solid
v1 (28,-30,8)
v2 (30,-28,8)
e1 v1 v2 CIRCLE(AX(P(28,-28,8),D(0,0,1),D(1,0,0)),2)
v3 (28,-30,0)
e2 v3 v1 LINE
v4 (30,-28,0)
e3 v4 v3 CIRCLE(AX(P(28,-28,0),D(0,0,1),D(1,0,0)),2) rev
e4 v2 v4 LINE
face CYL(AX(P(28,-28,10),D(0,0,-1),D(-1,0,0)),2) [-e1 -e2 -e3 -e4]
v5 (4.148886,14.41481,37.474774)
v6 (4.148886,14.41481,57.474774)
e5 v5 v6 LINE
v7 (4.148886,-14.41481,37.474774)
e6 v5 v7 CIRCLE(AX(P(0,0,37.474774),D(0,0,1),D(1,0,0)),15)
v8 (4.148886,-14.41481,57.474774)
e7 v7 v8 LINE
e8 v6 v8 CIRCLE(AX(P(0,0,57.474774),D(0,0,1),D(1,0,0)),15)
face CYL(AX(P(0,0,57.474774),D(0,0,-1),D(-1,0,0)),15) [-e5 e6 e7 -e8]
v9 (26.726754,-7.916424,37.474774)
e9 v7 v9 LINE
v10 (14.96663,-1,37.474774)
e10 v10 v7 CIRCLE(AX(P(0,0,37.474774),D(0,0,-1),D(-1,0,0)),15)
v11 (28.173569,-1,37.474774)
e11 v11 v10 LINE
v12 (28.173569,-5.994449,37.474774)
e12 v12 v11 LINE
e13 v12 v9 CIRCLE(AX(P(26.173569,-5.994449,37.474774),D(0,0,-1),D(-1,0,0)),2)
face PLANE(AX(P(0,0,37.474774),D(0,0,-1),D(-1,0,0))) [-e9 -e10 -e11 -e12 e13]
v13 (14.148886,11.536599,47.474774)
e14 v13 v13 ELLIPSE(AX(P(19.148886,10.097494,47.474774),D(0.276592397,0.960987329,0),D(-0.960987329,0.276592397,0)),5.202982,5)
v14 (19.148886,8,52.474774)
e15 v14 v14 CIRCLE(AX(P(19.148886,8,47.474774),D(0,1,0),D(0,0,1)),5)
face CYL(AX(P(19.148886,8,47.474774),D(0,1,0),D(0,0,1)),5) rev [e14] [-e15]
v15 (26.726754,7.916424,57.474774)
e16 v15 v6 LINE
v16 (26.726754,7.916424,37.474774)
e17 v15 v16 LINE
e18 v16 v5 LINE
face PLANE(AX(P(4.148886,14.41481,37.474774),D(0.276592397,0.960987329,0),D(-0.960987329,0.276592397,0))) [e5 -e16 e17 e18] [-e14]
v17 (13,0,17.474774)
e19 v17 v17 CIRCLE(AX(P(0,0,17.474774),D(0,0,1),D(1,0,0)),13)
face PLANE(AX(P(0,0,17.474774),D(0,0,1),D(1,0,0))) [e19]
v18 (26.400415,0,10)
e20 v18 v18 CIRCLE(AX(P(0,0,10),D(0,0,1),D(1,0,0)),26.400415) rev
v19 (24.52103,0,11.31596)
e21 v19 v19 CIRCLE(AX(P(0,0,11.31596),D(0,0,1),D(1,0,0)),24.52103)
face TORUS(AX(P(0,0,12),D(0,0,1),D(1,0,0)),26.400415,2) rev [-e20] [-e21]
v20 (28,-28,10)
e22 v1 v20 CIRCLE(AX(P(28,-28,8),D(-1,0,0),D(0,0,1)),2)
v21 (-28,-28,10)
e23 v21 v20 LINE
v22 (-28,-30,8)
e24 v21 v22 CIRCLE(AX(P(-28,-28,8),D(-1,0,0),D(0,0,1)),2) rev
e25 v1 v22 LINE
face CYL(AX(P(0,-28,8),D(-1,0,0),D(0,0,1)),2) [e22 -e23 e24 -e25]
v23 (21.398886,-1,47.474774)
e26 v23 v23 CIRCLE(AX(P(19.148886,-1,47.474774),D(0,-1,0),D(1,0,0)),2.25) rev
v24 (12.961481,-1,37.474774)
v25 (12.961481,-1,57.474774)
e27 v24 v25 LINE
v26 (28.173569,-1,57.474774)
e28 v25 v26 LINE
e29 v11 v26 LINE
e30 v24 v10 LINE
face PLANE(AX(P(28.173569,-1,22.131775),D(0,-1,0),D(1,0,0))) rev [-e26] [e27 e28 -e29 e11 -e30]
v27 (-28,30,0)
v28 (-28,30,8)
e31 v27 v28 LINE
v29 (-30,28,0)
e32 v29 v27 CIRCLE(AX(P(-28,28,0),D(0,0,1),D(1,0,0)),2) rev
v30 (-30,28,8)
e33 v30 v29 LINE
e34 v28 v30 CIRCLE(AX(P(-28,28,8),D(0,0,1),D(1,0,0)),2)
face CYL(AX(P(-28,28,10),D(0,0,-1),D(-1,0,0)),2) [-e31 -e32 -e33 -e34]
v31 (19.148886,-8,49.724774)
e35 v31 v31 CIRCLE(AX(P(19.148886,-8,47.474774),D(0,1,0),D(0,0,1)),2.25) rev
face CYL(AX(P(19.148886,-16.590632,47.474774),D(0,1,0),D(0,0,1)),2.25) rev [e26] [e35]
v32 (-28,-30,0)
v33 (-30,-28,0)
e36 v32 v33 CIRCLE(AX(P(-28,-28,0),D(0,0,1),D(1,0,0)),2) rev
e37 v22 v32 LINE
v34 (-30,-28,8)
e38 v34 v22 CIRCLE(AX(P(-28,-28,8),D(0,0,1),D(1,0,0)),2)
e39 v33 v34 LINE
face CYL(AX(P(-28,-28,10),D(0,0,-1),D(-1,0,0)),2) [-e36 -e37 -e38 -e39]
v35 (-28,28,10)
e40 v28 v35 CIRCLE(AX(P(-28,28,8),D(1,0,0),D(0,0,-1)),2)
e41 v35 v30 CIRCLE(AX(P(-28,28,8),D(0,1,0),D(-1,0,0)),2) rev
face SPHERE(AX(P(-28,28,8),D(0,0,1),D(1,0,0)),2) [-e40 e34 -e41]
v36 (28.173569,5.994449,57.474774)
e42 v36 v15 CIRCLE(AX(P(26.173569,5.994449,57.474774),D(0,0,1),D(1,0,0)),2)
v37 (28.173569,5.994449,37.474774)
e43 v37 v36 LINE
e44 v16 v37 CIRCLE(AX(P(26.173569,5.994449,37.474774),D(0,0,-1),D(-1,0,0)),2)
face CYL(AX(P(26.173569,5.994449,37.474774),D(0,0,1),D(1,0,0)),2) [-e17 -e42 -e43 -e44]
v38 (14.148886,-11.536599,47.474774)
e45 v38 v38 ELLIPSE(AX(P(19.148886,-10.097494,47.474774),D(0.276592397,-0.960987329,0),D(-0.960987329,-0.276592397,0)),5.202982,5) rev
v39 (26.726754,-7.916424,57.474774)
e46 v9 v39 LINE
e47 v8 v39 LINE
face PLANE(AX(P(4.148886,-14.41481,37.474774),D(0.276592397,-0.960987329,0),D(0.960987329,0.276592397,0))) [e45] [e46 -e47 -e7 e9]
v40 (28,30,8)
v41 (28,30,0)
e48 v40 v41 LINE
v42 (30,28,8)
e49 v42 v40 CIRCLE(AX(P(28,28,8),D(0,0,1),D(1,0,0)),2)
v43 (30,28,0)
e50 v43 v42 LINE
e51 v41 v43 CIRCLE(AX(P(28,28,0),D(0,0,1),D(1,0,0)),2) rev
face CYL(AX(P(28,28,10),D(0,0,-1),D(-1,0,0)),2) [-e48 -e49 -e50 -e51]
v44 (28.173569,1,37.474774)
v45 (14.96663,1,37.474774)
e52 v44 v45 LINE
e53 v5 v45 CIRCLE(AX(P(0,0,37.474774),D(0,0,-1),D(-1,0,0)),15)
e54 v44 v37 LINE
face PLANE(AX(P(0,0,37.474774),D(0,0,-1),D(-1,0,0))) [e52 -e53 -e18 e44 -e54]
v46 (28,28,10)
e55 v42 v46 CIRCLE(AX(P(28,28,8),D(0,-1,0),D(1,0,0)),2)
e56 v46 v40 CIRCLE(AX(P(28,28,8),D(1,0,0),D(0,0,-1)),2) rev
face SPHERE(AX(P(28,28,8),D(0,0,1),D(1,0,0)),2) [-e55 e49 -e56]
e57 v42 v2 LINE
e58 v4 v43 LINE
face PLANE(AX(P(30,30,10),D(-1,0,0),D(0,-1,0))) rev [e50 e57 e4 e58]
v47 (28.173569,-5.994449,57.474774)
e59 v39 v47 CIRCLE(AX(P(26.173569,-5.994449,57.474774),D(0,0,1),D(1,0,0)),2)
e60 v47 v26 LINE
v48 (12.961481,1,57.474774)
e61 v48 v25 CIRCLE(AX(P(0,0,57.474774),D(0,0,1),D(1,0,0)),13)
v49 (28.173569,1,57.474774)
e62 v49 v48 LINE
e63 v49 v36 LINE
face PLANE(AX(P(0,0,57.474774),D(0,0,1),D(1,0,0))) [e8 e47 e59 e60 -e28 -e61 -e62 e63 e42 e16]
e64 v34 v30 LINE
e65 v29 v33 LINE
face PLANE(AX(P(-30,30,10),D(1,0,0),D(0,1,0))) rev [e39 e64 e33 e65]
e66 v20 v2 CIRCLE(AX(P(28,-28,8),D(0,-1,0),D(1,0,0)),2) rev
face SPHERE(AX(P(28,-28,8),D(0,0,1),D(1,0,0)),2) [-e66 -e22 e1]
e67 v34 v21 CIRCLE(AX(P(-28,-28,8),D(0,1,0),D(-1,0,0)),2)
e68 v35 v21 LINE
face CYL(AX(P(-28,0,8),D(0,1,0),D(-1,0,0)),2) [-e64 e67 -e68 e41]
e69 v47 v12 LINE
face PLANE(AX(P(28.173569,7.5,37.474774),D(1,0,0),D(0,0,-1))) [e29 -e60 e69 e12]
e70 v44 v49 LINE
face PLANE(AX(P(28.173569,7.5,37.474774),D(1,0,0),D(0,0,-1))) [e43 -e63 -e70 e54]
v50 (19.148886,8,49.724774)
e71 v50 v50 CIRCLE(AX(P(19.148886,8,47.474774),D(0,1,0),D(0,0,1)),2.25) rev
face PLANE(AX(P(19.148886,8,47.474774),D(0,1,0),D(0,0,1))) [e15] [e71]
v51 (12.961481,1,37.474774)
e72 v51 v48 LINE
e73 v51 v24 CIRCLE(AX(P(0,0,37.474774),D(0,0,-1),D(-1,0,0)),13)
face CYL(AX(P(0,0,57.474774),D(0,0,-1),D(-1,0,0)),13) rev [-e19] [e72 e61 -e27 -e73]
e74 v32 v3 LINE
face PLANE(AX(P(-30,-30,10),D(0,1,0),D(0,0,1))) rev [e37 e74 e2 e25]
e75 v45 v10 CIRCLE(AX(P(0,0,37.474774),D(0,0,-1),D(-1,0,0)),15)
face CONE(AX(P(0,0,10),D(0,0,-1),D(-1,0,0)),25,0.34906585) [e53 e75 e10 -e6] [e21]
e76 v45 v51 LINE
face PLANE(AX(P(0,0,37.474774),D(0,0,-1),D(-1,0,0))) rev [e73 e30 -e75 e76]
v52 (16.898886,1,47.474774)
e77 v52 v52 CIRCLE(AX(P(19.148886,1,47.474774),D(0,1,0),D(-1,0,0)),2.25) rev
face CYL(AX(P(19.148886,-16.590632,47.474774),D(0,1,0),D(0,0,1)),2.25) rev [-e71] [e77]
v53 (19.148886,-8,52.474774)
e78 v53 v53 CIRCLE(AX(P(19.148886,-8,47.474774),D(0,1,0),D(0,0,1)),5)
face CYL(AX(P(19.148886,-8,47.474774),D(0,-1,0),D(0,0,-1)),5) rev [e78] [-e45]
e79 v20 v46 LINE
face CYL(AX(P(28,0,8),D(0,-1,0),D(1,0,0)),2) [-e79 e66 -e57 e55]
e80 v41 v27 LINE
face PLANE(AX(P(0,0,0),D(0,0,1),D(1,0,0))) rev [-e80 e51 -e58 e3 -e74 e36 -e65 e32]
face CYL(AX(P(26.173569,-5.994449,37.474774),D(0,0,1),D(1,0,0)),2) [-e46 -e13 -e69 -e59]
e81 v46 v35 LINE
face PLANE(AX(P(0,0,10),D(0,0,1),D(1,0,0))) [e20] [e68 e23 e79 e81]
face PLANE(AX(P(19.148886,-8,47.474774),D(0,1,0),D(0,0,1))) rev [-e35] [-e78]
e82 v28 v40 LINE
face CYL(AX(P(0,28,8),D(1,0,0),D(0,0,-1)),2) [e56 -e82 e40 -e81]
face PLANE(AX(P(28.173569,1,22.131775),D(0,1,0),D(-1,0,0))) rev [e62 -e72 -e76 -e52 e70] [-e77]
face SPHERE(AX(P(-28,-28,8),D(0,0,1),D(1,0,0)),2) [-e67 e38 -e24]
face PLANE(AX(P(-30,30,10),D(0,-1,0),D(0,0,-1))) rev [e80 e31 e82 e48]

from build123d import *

# Parameters (mm, degrees)
SKETCH1_W           = 60
SKETCH1_H           = 60
BOSS_EXTRUDE1_DEPTH = 10
FILLET1_R           = 2
FILLET2_R           = 2
SKETCH3_R           = 15
SKETCH3_R_2         = 13
BOSS_EXTRUDE2_DEPTH = 20
CUT_EXTRUDE1_START  = -20
SKETCH4_R           = 13
CUT_EXTRUDE1_DEPTH  = 20
BOSS_EXTRUDE4_START = -20
BOSS_EXTRUDE4_DEPTH = 20
FILLET5_R           = 2
CUT_EXTRUDE2_REACH  = 83.874
SKETCH12_R          = 2.25
SKETCH13_R          = 5
CUT_EXTRUDE3_DEPTH  = 12
CUT_EXTRUDE4_START  = 12
SKETCH14_R          = 5
CUT_EXTRUDE4_DEPTH  = 12
CUT_EXTRUDE12_START = -20
CUT_EXTRUDE12_DEPTH = 20


with BuildPart() as part:
    # Sketch1 → Boss-Extrude1 (new body)
    with BuildSketch(Plane.XY):
        Rectangle(SKETCH1_W, SKETCH1_H)
    extrude(amount=BOSS_EXTRUDE1_DEPTH)

    # Sketch2 → Revolve1 (revolve)
    with BuildSketch(Plane(origin=(0, 0, 0), x_dir=(1, 0, 0), z_dir=(0, 1, 0)), mode=Mode.PRIVATE) as revolve1_sk:
        Polygon((-25, -10), (-15, -37.474774195), (0, -37.474774195), (0, -10), align=None)
    revolve(revolve1_sk.sketch.rotate(Axis((0, 0, 38.640996606), (0, 0, -1)), 180), axis=Axis((0, 0, 38.640996606), (0, 0, -1)))

    # Fillet1
    fillet1_edges = [part.edges().sort_by_distance(p)[0] for p in [
        (30, 0, 10),
        (0, 30, 10),
        (-25, 0, 10),
        (-30, 0, 10),
        (0, -30, 10),
    ]]
    fillet(fillet1_edges, radius=FILLET1_R)

    # Fillet2
    # the kernel refuses this fillet: 2 mm, written as the material it takes off along each edge
    with BuildSketch(Plane(origin=(28, -28, 8), x_dir=(0, -1, 0), z_dir=(1, 0, 0))) as fillet2_piece_1_section:
        Polygon((0, 0), (FILLET2_R, 0), (FILLET2_R, -FILLET2_R), (0, -FILLET2_R), align=None)
    fillet2_piece_1 = extrude(amount=FILLET2_R, mode=Mode.PRIVATE)
    fillet2_piece_1 = fillet2_piece_1 - Plane(origin=(28, -28, 8), x_dir=(0, 0.7071067811865475, -0.7071067811865475), z_dir=(1, 0, 0)) * Sphere(FILLET2_R, mode=Mode.PRIVATE)
    add(fillet2_piece_1, mode=Mode.SUBTRACT)
    with BuildSketch(Plane(origin=(-28, -28, 8), x_dir=(0, -1, 0), z_dir=(-1, 0, 0))) as fillet2_piece_2_section:
        Polygon((0, 0), (FILLET2_R, 0), (FILLET2_R, FILLET2_R), (0, FILLET2_R), align=None)
    fillet2_piece_2 = extrude(amount=FILLET2_R, mode=Mode.PRIVATE)
    fillet2_piece_2 = fillet2_piece_2 - Plane(origin=(-28, -28, 8), x_dir=(0, 0.7071067811865475, -0.7071067811865475), z_dir=(-1, 0, 0)) * Sphere(FILLET2_R, mode=Mode.PRIVATE)
    add(fillet2_piece_2, mode=Mode.SUBTRACT)
    with BuildSketch(Plane(origin=(28, 28, 8), x_dir=(1, 0, 0), z_dir=(0, 1, 0))) as fillet2_piece_3_section:
        Polygon((0, 0), (FILLET2_R, 0), (FILLET2_R, -FILLET2_R), (0, -FILLET2_R), align=None)
    fillet2_piece_3 = extrude(amount=FILLET2_R, mode=Mode.PRIVATE)
    fillet2_piece_3 = fillet2_piece_3 - Plane(origin=(28, 28, 8), x_dir=(-0.7071067811865475, 0, -0.7071067811865475), z_dir=(0, 1, 0)) * Sphere(FILLET2_R, mode=Mode.PRIVATE)
    add(fillet2_piece_3, mode=Mode.SUBTRACT)
    with BuildSketch(Plane(origin=(-28, 28, 8), x_dir=(-1, 0, 0), z_dir=(0, 1, 0))) as fillet2_piece_4_section:
        Polygon((0, 0), (FILLET2_R, 0), (FILLET2_R, FILLET2_R), (0, FILLET2_R), align=None)
    fillet2_piece_4 = extrude(amount=FILLET2_R, mode=Mode.PRIVATE)
    fillet2_piece_4 = fillet2_piece_4 - Plane(origin=(-28, 28, 8), x_dir=(0.7071067811865475, 0, -0.7071067811865475), z_dir=(0, 1, 0)) * Sphere(FILLET2_R, mode=Mode.PRIVATE)
    add(fillet2_piece_4, mode=Mode.SUBTRACT)
    with BuildSketch(Plane(origin=(-30, 30, -5), x_dir=(1, 0, 0), z_dir=(0, 0, 1)), Plane(origin=(-30, -30, -5), x_dir=(0, 1, 0), z_dir=(0, 0, 1))) as fillet2_piece_5:
        with BuildLine():
            CenterArc((FILLET2_R, -FILLET2_R), FILLET2_R, 90, 90)
            Line((0, -FILLET2_R), (0, 0))
            Line((0, 0), (FILLET2_R, 0))
        make_face()
    extrude(amount=13, mode=Mode.SUBTRACT)
    with BuildSketch(Plane(origin=(30, 30, -5), x_dir=(-1, 0, 0), z_dir=(0, 0, 1)), Plane(origin=(30, -30, -5), x_dir=(0, 1, 0), z_dir=(0, 0, 1))) as fillet2_piece_6:
        with BuildLine():
            CenterArc((FILLET2_R, FILLET2_R), FILLET2_R, 180, 90)
            Line((0, FILLET2_R), (0, 0))
            Line((0, 0), (FILLET2_R, 0))
        make_face()
    extrude(amount=13, mode=Mode.SUBTRACT)

    # Sketch3 → Boss-Extrude2 (add)
    with BuildSketch(Plane.XY.offset(37.474774195)):
        Circle(SKETCH3_R)
        Circle(SKETCH3_R_2, mode=Mode.SUBTRACT)
    extrude(amount=BOSS_EXTRUDE2_DEPTH)

    # Sketch4 → Cut-Extrude1 (cut)
    with BuildSketch(Plane.XY.offset(37.474774195).offset(CUT_EXTRUDE1_START)):
        Circle(SKETCH4_R)
    extrude(amount=CUT_EXTRUDE1_DEPTH, mode=Mode.SUBTRACT)

    # Sketch7 → Boss-Extrude4 (add)
    with BuildSketch(Plane.XY.offset(57.474774195).offset(BOSS_EXTRUDE4_START)):
        with BuildLine():
            Line((4.148885958, 14.41480993), (28.173569174, 7.5))
            Line((28.173569174, 7.5), (28.173569174, -7.5))
            Line((28.173569174, -7.5), (4.148885958, -14.41480993))
            ThreePointArc((4.148885958, -14.41480993), (15, 0), (4.148885958, 14.41480993))
        make_face()
    extrude(amount=BOSS_EXTRUDE4_DEPTH)

    # Fillet5
    fillet5_edges = [part.edges().sort_by_distance(p)[0] for p in [
        (28.173569174, 7.5, 47.474774195),
        (28.173569174, -7.5, 47.474774195),
    ]]
    fillet(fillet5_edges, radius=FILLET5_R)

    # Cut-Extrude2: up to this plane
    cut_extrude2_end = Plane(origin=(4.148885958, -14.41480993, 37.474774195), z_dir=(0.27659239718755785, -0.9609873286459298, 0))
    # Sketch12 → Cut-Extrude2 (cut, up to the surface)
    with BuildSketch(Plane(origin=(0, 20, 0), x_dir=(1, 0, 0), z_dir=(0, 1, 0)), mode=Mode.PRIVATE) as cut_extrude2_sk1:
        with Locations(Location((19.148885958, -47.474774195, 0), (0, 0, 180))):
            Circle(SKETCH12_R)
    cut_extrude2_tool1 = split(extrude(cut_extrude2_sk1.sketch, amount=-CUT_EXTRUDE2_REACH, mode=Mode.PRIVATE), bisect_by=cut_extrude2_end, keep=Keep.BOTH, mode=Mode.PRIVATE)
    add(cut_extrude2_tool1.solids().sort_by_distance((19.148886, 20, 47.474774))[0], mode=Mode.SUBTRACT)

    # Sketch13 → Cut-Extrude3 (cut)
    with BuildSketch(Plane(origin=(0, 20, 0), x_dir=(1, 0, 0), z_dir=(0, 1, 0))):
        with Locations(Location((19.148885958, -47.474774195, 0), (0, 0, 270))):
            Circle(SKETCH13_R)
    extrude(amount=-CUT_EXTRUDE3_DEPTH, mode=Mode.SUBTRACT)

    # Sketch14 → Cut-Extrude4 (cut)
    with BuildSketch(Plane(origin=(0, -20, 0), x_dir=(1, 0, 0), z_dir=(0, 1, 0)).offset(CUT_EXTRUDE4_START)):
        with Locations(Location((19.148885958, -47.474774195, 0), (0, 0, 270))):
            Circle(SKETCH14_R)
    extrude(amount=-CUT_EXTRUDE4_DEPTH, mode=Mode.SUBTRACT)

    # Sketch15 → Cut-Extrude12 (cut)
    with BuildSketch(Plane.XY.offset(57.474774195).offset(CUT_EXTRUDE12_START)):
        with BuildLine():
            Line((28.173569174, 1), (12.961481397, 1))
            ThreePointArc((12.961481397, 1), (13, 0), (12.961481397, -1))
            Line((12.961481397, -1), (28.173569174, -1))
            Line((28.173569174, -1), (28.173569174, 1))
        make_face()
    extrude(amount=CUT_EXTRUDE12_DEPTH, mode=Mode.SUBTRACT)


solid = part.part
